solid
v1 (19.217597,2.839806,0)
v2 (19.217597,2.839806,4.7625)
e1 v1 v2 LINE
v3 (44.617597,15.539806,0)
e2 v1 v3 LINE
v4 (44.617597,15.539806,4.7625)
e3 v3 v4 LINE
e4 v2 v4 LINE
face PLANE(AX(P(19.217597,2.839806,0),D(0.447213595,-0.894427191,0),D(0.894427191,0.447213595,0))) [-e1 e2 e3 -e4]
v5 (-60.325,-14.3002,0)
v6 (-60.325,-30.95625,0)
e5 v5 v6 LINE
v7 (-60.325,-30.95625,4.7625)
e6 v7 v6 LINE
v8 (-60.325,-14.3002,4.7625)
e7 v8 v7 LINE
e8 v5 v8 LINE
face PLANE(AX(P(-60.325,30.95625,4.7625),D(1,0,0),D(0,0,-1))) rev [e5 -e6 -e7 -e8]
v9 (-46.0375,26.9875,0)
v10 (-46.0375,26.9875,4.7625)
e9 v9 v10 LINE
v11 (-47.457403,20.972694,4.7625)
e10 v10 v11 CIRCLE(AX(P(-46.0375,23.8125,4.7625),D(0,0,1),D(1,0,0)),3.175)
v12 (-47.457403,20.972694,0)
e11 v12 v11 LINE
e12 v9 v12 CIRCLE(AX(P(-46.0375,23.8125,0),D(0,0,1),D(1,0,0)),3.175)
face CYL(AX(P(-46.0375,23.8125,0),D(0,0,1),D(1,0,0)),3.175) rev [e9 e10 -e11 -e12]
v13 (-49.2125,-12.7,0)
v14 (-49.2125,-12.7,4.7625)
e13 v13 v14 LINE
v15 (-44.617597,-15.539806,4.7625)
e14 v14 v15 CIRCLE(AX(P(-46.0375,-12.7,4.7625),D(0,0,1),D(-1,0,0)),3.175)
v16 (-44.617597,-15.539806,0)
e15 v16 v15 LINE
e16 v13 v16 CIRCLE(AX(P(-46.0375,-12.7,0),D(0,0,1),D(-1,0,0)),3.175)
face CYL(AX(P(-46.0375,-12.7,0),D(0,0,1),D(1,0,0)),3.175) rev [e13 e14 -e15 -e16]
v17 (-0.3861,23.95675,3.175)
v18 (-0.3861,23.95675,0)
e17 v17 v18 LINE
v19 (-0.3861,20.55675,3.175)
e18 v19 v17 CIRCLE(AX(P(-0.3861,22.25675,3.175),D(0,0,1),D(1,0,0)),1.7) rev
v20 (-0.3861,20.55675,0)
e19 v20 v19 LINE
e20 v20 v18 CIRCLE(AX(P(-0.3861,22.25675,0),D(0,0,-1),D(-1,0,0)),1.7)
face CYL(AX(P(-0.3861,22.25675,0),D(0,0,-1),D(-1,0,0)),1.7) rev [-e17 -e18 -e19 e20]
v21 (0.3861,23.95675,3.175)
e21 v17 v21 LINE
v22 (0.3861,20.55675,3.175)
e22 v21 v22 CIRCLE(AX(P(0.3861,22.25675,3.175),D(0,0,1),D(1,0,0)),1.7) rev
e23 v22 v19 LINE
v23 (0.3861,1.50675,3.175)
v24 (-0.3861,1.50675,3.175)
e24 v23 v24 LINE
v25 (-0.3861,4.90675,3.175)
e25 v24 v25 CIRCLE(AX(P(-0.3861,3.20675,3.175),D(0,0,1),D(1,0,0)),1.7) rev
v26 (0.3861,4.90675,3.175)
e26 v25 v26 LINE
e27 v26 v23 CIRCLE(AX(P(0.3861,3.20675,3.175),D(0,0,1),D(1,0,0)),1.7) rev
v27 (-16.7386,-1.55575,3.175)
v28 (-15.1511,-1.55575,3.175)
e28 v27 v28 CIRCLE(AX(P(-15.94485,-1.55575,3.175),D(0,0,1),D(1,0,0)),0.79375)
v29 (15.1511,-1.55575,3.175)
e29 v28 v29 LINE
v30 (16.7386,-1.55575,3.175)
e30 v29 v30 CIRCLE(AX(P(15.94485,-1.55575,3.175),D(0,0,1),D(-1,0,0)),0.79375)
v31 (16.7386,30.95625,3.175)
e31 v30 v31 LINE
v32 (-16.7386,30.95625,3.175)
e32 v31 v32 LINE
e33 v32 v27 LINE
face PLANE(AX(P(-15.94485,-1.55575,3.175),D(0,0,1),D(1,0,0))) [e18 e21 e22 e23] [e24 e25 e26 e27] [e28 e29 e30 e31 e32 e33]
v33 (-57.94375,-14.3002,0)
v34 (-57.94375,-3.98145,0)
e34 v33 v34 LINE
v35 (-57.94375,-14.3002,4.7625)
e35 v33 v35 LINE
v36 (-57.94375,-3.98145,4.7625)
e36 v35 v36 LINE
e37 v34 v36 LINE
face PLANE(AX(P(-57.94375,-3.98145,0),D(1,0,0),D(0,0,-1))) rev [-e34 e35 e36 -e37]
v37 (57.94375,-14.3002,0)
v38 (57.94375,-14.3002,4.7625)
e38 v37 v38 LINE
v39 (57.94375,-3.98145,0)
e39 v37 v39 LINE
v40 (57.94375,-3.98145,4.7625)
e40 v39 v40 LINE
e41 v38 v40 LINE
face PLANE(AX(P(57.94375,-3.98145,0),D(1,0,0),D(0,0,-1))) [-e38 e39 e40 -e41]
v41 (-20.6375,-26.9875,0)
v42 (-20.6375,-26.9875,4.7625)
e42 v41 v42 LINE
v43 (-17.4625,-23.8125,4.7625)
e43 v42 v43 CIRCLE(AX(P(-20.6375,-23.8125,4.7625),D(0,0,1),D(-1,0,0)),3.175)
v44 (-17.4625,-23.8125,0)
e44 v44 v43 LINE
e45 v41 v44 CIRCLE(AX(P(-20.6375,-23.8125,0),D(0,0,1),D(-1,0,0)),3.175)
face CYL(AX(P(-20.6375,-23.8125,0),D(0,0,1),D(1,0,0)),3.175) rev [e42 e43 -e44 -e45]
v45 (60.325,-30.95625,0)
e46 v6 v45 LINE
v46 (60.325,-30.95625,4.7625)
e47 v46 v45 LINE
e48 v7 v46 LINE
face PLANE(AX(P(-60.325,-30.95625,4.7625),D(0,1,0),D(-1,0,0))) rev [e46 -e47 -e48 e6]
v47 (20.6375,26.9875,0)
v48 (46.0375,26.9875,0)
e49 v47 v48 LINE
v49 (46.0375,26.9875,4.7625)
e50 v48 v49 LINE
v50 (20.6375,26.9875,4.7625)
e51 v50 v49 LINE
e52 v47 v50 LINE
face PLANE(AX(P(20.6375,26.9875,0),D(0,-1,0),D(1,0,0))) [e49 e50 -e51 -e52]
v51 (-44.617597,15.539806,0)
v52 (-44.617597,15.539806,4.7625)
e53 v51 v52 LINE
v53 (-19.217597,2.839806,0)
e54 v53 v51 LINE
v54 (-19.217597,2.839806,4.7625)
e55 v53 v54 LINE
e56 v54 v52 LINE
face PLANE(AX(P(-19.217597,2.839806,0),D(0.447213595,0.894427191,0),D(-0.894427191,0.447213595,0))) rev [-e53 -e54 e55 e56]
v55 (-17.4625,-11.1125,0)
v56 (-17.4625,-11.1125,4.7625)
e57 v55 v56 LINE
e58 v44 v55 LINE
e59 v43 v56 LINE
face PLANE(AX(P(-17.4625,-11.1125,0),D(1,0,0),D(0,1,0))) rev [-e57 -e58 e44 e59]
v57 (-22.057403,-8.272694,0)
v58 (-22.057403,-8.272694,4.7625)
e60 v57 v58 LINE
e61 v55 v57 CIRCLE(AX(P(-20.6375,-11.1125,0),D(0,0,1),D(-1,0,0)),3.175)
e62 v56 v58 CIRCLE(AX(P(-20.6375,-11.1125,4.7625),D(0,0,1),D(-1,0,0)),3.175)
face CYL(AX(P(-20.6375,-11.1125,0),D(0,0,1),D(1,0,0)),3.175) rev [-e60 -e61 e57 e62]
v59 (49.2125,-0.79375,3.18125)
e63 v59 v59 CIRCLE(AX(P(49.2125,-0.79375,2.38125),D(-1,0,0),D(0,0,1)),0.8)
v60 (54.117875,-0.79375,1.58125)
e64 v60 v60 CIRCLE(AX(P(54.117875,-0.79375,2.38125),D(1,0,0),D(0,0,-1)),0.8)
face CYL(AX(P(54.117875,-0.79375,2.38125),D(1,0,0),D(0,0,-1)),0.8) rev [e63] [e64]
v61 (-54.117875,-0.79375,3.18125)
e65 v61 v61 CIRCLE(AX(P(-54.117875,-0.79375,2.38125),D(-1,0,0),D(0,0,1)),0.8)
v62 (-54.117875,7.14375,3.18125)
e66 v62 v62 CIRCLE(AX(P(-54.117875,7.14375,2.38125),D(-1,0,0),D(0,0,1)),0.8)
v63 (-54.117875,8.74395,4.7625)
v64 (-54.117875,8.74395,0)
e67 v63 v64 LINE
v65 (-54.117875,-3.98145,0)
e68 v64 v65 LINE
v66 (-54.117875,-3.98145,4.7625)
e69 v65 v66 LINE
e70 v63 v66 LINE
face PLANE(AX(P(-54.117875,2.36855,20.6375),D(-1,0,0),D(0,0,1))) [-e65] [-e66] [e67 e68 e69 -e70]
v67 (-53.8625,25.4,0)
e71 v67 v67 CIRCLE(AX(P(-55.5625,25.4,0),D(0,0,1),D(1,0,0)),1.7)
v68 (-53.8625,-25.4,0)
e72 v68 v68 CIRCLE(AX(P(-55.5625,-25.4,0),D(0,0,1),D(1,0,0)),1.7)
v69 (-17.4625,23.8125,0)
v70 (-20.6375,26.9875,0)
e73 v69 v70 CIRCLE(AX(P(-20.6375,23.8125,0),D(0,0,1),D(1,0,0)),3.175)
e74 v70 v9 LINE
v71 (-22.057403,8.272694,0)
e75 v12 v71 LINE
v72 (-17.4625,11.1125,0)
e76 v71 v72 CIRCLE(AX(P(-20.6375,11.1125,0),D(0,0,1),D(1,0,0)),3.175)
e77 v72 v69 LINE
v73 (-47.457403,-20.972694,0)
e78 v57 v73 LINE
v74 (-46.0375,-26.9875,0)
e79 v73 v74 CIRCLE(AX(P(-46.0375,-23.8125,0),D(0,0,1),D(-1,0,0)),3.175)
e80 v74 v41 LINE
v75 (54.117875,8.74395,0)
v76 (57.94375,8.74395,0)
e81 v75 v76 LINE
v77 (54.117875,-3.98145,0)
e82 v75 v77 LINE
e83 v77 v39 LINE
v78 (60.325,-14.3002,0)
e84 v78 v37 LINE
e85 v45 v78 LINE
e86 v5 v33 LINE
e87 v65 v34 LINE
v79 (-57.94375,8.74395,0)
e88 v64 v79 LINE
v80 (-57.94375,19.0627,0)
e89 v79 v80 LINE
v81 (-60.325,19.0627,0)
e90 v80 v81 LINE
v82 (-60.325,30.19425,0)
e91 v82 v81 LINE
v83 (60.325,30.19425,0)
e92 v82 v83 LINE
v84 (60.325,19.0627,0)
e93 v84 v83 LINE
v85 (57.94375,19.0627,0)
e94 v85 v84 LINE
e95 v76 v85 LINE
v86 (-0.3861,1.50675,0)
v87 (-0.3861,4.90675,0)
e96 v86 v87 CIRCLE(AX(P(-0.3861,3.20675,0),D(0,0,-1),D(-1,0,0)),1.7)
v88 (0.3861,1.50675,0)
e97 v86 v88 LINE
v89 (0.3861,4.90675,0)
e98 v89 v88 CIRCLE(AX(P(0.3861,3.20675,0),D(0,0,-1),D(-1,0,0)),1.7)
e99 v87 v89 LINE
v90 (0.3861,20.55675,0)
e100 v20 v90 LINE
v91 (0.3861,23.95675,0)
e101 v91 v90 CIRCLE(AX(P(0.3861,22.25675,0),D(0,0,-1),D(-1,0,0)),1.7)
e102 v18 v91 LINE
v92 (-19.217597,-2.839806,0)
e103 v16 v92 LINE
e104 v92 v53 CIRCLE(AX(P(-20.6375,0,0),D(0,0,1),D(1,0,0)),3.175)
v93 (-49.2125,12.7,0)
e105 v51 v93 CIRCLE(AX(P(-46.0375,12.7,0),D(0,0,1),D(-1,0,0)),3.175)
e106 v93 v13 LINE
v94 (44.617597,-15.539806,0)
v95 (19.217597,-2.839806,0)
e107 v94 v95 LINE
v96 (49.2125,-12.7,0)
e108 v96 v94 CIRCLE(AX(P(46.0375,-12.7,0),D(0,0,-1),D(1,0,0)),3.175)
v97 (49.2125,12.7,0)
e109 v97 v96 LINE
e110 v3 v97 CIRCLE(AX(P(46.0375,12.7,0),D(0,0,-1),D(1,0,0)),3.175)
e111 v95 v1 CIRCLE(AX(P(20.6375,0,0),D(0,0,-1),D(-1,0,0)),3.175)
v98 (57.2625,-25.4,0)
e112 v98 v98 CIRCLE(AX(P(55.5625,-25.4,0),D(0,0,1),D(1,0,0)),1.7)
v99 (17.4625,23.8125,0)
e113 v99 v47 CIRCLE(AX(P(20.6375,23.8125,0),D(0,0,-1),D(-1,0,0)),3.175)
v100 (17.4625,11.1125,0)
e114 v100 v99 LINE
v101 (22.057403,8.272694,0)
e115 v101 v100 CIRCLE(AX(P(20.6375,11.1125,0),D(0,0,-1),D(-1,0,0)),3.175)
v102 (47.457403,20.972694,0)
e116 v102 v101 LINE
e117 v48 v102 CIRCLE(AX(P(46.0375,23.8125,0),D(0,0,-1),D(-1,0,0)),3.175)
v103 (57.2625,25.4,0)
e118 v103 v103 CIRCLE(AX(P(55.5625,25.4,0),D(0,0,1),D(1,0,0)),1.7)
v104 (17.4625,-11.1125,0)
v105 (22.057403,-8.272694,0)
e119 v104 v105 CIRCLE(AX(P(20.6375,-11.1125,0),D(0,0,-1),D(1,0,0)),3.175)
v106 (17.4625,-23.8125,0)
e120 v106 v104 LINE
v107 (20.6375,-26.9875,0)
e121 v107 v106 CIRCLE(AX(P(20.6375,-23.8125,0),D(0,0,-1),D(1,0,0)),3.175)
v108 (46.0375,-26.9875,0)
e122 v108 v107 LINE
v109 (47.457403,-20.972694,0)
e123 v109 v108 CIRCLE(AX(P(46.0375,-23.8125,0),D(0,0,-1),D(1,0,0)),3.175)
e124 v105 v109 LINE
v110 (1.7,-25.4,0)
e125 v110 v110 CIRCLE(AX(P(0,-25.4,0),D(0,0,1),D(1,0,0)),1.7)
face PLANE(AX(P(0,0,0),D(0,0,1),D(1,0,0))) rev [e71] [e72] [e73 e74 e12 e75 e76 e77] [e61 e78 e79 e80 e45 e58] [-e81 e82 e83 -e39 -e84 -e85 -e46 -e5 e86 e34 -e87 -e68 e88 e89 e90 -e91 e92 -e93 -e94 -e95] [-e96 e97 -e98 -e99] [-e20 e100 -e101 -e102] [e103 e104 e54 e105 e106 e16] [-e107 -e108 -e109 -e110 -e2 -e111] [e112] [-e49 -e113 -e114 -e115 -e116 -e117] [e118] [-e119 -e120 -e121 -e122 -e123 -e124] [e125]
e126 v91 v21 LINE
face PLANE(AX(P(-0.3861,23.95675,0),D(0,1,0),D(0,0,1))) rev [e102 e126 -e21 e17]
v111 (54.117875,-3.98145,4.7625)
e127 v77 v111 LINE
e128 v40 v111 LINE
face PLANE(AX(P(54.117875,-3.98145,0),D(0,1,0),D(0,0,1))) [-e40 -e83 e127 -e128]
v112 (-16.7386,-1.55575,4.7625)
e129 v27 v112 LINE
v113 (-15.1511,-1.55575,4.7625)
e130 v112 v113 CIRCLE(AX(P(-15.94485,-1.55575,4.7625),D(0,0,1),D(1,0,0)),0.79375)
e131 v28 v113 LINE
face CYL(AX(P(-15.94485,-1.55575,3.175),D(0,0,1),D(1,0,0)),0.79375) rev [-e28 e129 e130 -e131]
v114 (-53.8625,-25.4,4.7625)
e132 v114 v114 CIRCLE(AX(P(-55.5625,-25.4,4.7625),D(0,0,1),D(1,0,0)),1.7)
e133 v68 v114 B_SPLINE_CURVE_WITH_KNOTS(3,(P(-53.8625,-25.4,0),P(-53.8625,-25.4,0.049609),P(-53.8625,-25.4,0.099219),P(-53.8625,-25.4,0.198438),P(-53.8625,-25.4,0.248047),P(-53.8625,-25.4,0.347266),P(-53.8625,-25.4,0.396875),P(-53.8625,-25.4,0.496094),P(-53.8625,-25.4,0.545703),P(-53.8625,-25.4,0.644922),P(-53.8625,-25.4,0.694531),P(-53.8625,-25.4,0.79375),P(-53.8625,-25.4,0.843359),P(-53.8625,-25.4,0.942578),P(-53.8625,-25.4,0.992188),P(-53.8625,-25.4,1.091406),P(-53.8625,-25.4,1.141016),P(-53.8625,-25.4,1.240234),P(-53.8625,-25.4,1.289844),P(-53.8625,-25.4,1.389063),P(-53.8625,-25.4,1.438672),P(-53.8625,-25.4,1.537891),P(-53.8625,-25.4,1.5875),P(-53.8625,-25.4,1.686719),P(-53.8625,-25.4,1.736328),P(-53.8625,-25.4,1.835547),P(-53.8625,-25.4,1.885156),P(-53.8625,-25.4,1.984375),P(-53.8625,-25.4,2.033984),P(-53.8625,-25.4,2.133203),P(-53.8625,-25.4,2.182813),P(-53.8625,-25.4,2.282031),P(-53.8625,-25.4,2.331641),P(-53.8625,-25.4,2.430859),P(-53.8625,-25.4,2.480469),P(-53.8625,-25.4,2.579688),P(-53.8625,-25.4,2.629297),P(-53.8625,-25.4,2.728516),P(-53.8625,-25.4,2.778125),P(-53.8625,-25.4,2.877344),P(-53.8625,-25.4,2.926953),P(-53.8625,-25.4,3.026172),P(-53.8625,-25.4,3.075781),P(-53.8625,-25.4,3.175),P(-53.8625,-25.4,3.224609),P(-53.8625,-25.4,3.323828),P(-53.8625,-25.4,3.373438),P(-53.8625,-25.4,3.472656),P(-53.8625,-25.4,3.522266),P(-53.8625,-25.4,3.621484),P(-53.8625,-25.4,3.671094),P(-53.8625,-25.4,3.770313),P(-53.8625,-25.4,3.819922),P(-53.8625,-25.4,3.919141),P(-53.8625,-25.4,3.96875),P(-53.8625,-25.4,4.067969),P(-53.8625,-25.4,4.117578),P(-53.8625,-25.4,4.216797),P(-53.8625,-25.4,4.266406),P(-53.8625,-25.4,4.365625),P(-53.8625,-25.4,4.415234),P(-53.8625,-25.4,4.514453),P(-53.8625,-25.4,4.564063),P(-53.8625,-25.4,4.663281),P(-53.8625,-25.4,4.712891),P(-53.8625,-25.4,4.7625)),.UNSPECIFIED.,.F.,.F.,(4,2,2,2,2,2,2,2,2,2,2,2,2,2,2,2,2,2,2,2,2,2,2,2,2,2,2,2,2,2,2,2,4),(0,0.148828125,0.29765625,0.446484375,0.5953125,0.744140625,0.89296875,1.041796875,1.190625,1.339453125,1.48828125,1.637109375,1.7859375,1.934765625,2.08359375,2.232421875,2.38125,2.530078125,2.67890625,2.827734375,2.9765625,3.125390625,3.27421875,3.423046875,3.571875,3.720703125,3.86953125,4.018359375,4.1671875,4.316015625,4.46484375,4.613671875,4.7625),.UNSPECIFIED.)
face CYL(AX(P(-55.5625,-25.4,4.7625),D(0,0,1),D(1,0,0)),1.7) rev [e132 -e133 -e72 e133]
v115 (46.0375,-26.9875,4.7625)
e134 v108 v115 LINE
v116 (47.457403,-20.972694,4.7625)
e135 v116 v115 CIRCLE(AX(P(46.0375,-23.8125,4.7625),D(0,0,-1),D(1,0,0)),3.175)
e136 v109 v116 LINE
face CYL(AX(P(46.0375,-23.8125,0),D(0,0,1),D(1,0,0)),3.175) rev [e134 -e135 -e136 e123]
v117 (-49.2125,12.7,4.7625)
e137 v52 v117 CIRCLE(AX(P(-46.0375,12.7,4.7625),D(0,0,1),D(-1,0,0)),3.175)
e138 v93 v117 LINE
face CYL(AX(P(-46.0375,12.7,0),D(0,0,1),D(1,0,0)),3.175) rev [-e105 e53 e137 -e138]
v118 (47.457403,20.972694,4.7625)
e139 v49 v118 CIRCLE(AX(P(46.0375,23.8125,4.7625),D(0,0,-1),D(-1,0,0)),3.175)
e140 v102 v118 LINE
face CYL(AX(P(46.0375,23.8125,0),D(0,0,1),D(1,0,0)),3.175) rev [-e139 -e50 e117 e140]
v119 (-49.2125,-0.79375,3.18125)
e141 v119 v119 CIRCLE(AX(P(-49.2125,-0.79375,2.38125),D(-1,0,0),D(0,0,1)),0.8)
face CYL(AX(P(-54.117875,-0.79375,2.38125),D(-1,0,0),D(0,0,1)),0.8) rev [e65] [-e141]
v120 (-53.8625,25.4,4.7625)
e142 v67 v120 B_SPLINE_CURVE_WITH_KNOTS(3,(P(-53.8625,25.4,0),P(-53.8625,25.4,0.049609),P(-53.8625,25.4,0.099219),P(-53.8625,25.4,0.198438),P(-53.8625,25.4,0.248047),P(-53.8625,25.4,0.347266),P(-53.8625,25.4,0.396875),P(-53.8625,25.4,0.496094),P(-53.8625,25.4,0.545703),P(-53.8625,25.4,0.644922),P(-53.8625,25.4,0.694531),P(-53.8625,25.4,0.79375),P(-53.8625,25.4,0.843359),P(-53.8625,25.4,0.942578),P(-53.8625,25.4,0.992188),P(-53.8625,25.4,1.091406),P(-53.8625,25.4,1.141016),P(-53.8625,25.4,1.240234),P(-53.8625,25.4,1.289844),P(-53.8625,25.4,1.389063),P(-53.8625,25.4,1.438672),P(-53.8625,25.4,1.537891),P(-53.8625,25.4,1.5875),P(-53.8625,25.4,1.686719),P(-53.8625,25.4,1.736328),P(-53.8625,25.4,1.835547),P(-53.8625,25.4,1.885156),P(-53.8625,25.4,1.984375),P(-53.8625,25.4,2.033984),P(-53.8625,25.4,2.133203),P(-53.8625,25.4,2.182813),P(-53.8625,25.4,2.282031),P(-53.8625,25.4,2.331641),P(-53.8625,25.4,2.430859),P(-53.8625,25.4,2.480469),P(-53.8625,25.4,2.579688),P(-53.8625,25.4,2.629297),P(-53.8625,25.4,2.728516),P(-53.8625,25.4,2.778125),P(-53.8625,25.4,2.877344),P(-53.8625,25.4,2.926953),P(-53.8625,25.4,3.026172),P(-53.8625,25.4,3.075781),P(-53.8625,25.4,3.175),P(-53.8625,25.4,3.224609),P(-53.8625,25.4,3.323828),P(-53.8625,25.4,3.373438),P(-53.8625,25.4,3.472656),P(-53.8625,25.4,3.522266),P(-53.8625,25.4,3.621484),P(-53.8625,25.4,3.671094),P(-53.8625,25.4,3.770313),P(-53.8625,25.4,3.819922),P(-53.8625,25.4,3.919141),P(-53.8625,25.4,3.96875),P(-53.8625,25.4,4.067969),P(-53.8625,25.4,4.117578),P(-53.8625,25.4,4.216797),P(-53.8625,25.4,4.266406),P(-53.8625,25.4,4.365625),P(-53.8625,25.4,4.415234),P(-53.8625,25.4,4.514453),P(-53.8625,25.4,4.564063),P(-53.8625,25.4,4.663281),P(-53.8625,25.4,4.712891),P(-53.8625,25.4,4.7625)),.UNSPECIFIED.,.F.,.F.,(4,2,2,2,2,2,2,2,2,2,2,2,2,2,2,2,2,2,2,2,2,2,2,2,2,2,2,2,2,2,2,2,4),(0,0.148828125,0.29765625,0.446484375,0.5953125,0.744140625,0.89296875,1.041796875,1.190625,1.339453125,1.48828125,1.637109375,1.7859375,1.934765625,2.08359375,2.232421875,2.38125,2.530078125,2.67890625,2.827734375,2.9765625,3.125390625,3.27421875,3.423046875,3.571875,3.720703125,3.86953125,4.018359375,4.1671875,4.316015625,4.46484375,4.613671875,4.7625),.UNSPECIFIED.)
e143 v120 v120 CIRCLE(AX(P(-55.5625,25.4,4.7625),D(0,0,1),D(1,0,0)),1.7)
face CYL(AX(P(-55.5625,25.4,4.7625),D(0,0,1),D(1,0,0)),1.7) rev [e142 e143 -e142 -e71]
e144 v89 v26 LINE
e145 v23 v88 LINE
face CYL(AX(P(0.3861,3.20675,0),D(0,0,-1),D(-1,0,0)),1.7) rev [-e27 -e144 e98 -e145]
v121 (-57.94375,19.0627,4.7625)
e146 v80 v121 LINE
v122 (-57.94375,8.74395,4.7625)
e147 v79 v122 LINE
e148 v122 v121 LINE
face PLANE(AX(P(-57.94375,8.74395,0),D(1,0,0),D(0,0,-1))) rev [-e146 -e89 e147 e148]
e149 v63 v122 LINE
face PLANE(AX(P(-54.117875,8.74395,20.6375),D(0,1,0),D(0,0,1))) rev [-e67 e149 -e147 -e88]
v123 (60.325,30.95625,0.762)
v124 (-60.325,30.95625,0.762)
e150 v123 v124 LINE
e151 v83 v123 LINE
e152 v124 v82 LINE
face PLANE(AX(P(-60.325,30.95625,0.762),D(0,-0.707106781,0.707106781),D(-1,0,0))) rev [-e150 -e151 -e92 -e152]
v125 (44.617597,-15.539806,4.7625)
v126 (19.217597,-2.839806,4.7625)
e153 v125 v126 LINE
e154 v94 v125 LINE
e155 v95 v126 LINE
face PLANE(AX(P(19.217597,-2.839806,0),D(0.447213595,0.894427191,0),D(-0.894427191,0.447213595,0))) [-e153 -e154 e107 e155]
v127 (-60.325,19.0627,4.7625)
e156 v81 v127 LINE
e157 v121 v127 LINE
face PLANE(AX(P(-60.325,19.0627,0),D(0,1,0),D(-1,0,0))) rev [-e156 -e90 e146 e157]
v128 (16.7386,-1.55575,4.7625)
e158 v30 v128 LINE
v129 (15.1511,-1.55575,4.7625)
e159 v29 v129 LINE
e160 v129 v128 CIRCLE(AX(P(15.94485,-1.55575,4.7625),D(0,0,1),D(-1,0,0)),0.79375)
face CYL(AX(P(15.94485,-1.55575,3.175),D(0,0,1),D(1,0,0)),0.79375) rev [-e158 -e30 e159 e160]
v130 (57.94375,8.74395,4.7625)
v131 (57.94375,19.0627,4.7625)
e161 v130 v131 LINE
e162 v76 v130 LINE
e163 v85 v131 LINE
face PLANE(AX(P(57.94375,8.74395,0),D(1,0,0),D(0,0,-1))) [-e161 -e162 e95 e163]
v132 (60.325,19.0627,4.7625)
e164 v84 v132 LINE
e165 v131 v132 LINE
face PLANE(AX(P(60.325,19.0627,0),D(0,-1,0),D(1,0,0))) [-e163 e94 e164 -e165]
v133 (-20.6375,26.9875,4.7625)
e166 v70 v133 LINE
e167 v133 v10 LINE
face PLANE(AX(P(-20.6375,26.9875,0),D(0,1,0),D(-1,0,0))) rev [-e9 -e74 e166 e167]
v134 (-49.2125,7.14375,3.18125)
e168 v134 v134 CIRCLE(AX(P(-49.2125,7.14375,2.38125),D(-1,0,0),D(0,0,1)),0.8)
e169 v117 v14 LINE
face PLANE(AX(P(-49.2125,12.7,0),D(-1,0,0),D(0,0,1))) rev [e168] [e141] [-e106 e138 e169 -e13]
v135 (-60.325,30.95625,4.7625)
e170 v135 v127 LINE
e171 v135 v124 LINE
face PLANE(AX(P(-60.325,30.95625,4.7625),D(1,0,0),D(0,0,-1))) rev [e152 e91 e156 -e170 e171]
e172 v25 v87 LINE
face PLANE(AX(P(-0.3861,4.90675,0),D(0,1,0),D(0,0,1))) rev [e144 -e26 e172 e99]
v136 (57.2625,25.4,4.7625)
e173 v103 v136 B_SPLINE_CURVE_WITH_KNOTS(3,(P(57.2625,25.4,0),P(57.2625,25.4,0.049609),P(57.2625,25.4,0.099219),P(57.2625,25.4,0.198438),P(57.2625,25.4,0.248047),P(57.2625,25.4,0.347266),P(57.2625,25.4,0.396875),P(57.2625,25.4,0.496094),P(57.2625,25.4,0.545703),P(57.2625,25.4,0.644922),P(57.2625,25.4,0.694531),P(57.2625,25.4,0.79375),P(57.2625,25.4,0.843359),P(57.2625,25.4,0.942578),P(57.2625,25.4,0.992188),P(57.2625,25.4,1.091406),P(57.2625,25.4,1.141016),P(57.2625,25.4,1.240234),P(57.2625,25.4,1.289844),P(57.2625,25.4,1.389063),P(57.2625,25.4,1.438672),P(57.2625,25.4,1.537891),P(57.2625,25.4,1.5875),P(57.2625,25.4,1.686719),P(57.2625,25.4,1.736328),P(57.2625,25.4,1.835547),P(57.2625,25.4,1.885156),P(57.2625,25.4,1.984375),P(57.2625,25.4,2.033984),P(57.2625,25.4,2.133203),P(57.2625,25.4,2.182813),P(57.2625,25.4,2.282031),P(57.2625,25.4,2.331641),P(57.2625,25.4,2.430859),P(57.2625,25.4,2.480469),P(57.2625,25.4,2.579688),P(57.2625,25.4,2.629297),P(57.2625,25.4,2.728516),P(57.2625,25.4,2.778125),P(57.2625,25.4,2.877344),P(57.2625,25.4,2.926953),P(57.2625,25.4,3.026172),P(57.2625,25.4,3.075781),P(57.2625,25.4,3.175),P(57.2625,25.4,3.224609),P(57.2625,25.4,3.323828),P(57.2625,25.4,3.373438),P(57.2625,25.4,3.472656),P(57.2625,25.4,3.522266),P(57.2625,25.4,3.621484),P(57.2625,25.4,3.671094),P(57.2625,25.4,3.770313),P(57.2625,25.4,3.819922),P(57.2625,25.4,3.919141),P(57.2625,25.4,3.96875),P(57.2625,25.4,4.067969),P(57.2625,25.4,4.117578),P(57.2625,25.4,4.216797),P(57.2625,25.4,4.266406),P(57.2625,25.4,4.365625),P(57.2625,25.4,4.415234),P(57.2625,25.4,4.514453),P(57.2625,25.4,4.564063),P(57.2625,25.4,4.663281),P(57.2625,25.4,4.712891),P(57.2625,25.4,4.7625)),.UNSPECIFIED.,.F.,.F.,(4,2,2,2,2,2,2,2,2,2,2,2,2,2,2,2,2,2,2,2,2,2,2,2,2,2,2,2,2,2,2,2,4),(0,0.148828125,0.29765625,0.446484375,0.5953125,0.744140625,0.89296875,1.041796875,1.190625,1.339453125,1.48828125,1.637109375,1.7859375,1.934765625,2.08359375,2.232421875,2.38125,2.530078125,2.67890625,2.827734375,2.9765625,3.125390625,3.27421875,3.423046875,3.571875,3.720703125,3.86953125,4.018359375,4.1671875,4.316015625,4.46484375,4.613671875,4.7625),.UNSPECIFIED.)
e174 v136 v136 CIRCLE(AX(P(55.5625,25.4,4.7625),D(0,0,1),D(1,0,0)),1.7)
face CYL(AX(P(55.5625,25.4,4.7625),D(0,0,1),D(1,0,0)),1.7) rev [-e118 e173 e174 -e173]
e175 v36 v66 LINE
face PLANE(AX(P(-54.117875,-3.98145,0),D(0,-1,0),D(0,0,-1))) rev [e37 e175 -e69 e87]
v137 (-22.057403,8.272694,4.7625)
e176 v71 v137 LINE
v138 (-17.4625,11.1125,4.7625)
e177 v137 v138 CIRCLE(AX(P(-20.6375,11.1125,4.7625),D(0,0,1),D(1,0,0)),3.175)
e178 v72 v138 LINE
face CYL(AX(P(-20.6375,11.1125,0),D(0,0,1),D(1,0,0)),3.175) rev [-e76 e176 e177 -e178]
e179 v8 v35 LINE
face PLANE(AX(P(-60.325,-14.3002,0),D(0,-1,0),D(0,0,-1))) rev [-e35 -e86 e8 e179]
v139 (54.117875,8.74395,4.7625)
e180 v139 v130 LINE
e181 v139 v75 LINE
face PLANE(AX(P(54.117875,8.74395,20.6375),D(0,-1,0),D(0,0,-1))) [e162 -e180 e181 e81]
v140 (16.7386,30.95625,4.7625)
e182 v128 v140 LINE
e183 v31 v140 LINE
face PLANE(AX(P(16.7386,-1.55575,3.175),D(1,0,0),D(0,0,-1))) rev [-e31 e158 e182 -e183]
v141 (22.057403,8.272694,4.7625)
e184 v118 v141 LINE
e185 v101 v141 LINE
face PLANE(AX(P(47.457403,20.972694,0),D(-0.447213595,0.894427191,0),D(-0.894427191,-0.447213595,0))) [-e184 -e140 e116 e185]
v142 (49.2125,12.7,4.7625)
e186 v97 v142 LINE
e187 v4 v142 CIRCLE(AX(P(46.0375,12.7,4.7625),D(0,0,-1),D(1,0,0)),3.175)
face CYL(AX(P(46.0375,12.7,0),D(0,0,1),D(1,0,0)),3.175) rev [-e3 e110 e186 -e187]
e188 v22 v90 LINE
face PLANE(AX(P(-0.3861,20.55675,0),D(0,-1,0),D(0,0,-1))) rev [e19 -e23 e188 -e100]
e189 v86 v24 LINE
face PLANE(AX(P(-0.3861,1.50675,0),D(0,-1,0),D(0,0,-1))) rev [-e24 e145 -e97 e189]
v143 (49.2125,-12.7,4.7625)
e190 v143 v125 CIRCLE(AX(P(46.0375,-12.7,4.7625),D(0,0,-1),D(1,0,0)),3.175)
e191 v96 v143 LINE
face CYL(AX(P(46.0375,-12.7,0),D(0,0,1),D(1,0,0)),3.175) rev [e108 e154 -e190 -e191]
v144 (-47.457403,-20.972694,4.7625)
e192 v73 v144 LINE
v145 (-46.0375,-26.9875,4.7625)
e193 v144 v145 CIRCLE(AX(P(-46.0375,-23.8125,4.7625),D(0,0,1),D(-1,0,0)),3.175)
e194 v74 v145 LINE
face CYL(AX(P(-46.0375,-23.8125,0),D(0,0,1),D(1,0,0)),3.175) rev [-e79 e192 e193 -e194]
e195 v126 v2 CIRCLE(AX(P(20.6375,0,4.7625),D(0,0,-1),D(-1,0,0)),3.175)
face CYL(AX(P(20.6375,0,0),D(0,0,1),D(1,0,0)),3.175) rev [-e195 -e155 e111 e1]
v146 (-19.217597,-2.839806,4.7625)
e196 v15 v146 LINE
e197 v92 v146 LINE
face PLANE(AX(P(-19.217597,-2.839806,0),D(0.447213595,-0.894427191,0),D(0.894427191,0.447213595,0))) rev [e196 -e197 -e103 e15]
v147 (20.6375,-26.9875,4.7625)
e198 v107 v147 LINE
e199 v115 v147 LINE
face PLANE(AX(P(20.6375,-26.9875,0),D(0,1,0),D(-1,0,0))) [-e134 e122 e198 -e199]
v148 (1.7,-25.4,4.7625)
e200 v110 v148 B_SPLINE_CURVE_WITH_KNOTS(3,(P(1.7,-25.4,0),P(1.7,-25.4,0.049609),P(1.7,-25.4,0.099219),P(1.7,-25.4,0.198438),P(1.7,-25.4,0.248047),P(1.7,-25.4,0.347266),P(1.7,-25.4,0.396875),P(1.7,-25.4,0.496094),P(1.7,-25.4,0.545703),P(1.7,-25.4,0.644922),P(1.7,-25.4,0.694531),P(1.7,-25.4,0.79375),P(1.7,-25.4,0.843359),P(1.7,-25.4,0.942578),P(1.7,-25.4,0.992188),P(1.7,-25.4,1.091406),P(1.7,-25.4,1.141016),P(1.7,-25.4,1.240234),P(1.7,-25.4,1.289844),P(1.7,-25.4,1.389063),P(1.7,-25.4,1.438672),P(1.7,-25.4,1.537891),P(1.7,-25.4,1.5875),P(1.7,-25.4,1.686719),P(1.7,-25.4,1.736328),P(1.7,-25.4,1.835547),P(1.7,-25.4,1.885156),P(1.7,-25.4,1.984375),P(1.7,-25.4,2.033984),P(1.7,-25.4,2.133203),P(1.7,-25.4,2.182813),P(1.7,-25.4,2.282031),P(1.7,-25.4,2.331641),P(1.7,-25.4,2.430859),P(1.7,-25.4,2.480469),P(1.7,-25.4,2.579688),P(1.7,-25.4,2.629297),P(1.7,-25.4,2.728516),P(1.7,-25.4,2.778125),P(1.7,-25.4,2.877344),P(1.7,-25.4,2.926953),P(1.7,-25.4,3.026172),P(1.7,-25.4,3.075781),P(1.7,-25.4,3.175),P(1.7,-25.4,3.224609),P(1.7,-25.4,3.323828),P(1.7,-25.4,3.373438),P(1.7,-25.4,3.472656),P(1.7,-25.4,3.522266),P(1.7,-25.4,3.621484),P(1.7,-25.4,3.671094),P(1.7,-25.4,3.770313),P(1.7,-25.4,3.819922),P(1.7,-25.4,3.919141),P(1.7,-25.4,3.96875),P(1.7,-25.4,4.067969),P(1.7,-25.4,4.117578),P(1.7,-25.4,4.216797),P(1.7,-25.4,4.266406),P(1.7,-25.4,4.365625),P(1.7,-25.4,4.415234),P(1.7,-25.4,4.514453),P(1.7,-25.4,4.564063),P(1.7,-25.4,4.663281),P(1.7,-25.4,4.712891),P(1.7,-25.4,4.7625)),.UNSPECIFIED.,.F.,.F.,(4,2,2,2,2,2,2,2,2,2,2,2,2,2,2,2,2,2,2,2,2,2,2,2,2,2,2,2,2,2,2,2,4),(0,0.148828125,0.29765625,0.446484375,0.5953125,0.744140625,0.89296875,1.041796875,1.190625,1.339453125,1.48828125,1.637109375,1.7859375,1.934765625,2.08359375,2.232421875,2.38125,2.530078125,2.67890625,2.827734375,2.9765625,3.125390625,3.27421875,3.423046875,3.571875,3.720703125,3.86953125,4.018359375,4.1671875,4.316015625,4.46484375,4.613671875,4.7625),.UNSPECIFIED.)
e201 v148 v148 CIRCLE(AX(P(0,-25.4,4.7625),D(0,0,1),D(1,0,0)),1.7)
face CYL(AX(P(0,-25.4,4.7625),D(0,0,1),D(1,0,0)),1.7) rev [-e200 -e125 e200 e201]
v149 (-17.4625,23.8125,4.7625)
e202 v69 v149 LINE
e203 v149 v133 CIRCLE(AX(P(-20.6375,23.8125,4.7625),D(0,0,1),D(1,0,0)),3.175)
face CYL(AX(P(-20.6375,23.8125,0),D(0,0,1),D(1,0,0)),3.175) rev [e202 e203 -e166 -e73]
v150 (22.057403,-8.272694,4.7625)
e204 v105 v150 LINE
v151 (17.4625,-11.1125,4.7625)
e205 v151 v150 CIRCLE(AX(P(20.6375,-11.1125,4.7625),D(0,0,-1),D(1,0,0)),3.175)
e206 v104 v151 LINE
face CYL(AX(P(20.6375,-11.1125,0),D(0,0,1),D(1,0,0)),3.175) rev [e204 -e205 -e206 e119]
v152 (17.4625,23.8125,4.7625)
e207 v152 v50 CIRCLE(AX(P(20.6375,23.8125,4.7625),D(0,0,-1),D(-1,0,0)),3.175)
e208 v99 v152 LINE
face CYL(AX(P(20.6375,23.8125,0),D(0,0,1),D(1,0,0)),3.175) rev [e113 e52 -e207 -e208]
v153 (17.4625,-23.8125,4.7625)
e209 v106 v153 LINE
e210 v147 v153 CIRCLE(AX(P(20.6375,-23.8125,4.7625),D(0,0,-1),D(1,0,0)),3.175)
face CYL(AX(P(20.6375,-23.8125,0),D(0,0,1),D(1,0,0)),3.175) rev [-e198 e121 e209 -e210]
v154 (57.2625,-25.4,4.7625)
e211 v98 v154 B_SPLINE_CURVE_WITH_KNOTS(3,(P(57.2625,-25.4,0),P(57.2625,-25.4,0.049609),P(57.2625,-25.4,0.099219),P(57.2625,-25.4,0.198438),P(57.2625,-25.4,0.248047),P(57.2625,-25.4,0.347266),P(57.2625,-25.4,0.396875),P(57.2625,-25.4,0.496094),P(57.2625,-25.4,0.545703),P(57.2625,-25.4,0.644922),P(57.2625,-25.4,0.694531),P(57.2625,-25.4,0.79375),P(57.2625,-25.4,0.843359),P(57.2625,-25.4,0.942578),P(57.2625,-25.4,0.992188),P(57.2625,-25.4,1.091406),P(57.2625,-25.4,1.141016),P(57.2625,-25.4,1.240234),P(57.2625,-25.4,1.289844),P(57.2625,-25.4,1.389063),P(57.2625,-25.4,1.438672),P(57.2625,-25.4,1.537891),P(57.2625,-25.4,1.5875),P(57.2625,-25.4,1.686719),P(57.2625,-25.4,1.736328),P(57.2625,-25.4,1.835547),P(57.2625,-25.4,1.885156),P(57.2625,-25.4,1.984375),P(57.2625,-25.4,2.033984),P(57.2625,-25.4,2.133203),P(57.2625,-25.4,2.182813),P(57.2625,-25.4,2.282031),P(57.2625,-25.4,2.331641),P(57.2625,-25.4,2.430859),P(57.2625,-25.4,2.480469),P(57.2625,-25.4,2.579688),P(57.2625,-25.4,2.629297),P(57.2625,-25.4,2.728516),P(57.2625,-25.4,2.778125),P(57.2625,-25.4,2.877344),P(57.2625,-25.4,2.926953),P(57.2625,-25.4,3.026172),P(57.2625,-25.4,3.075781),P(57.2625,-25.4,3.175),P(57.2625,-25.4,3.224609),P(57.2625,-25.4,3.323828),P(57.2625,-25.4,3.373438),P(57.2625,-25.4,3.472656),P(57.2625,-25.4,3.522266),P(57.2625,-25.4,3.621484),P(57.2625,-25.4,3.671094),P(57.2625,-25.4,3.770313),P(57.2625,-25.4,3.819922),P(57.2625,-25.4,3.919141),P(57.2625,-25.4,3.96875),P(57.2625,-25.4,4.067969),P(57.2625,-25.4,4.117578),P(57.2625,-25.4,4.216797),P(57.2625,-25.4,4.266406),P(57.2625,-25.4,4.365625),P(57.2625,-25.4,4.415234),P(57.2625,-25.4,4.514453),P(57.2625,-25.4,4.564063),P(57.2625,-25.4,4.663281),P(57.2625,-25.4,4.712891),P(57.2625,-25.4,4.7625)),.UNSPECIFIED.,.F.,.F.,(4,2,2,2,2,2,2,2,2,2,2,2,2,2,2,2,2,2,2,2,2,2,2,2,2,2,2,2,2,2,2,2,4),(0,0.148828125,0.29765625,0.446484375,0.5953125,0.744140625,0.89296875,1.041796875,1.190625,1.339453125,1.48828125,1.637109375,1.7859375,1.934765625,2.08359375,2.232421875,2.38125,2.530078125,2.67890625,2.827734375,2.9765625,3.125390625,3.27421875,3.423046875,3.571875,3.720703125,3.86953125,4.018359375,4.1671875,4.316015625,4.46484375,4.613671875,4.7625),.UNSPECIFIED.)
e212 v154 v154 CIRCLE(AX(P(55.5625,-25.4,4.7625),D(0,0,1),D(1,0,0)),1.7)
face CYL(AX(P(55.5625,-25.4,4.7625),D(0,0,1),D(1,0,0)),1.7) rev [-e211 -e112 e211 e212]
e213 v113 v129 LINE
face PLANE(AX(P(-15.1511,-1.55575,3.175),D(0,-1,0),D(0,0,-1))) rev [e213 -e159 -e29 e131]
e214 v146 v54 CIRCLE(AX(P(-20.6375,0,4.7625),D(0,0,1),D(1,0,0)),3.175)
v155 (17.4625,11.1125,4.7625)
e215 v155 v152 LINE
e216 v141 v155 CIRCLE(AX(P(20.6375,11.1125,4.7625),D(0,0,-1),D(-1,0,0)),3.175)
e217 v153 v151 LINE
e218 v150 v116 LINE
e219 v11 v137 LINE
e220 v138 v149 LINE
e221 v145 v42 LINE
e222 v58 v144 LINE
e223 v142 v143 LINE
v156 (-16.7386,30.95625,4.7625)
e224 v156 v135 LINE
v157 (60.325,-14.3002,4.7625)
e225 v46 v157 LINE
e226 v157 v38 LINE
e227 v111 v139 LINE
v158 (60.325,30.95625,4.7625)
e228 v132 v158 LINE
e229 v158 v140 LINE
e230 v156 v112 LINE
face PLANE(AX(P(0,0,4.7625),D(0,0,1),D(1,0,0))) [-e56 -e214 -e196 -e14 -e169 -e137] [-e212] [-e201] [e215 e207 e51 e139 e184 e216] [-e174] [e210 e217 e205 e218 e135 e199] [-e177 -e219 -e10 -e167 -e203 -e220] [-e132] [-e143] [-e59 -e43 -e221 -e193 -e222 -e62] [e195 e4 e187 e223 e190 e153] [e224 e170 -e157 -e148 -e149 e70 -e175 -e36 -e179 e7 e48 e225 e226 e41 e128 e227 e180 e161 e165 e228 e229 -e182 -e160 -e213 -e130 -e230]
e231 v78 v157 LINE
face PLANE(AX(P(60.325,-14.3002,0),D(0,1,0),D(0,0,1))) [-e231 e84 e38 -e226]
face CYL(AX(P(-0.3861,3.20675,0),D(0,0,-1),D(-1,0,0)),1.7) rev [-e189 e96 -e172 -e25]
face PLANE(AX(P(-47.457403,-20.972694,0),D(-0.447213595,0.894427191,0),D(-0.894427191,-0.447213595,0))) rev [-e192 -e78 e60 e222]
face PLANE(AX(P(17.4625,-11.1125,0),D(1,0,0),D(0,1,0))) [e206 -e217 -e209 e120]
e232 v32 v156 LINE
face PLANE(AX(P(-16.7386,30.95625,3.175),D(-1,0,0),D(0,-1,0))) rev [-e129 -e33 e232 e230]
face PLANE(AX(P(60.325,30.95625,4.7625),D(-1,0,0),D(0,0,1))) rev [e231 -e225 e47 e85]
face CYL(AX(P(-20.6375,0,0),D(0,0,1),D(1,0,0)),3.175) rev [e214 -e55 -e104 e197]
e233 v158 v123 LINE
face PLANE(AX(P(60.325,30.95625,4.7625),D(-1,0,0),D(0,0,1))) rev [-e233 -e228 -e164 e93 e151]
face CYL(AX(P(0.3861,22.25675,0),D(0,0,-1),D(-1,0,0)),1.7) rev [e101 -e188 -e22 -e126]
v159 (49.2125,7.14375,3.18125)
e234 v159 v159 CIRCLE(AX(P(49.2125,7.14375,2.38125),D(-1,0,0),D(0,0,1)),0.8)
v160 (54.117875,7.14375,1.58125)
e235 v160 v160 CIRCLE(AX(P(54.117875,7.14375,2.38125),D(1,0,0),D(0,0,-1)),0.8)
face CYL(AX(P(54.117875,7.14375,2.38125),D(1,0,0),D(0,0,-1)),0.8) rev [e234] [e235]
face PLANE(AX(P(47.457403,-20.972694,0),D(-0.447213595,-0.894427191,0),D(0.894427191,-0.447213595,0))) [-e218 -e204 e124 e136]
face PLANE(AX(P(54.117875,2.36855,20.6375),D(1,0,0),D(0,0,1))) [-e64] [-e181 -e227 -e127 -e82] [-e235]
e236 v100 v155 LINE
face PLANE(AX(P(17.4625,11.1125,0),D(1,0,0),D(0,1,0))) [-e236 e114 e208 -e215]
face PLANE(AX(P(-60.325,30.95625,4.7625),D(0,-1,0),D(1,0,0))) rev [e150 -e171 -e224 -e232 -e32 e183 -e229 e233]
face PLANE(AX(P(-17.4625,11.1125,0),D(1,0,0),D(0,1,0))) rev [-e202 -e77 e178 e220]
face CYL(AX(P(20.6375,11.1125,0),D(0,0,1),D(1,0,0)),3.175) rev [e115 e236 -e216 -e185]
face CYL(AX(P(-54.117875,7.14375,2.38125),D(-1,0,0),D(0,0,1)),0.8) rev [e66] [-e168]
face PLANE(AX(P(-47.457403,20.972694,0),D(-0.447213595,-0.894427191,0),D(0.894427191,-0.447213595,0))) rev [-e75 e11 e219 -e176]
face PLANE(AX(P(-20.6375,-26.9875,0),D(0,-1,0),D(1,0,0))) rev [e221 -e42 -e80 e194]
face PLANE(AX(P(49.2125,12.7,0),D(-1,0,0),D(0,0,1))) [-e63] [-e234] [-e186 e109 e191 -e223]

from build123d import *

# Parameters (mm, degrees)
SKETCH1_W                 = 120.65
SKETCH1_H                 = 61.9125
BOSS_EXTRUDE1_DEPTH       = 4.7625
SKETCH2_W                 = 4.7625
SKETCH2_H                 = 12.7254
BOSS_EXTRUDE2_DEPTH       = 22.225
CUT_EXTRUDE1_REACH        = 129.448
SKETCH3_R                 = 2.25
FILLET1_R                 = 6.35
FILLET1_OF_MIRROR2_R      = 6.35
M3_CLEARANCE_SLOT1_DEPTH  = 4.7625
SKETCH7_W                 = 2.38125
SKETCH7_H                 = 10.31875
CUT_EXTRUDE3_DEPTH        = 72.353666087
CUT_EXTRUDE4_DEPTH        = 6.207125
CUT_EXTRUDE5_DEPTH        = 72.353666087
CUT_EXTRUDE6_DEPTH        = 72.353666087
M2X0_4_TAPPED_HOLE1_D     = 1.6
M2X0_4_TAPPED_HOLE1_DEPTH = 4.905375
CUT_EXTRUDE7_DEPTH        = 1.5875
M3_CLEARANCE_HOLE2_D      = 3.4
CHAMFER1_SIZE             = 0.762


# Read off the part's stored shape, not the designer's step: M3 Clearance Slot1
with BuildPart() as part:
    # Sketch1 → Boss-Extrude1 (new body)
    with BuildSketch(Plane.XY):
        Rectangle(SKETCH1_W, SKETCH1_H)
    extrude(amount=BOSS_EXTRUDE1_DEPTH)

    # Sketch2 → Boss-Extrude2 (add)
    with BuildSketch(Plane.XY.offset(4.7625)):
        with Locations((-57.94375, 2.38125)):
            Rectangle(SKETCH2_W, SKETCH2_H)
    boss_extrude2 = extrude(amount=BOSS_EXTRUDE2_DEPTH)

    # Sketch3 → Cut-Extrude1 (cut, up to next)
    with BuildSketch(Plane.ZY.offset(60.325), mode=Mode.PRIVATE) as cut_extrude1_sk1:
        with Locations((19.05, 2.36855)):
            Circle(SKETCH3_R)
    cut_extrude1_tool1 = extrude(cut_extrude1_sk1.sketch, amount=-CUT_EXTRUDE1_REACH, mode=Mode.PRIVATE) & part.part
    cut_extrude1 = cut_extrude1_tool1.solids().sort_by_distance((-60.325, 2.36855, 19.05))[0]
    add(cut_extrude1, mode=Mode.SUBTRACT)

    # Fillet1
    fillet1_edges = [part.edges().sort_by_distance(p)[0] for p in [
        (-57.94375, -3.98145, 26.9875),
        (-57.94375, 8.74395, 26.9875),
    ]]
    fillet(fillet1_edges, radius=FILLET1_R)

    # Mirror2: Boss-Extrude2, Cut-Extrude1 across plane
    add(boss_extrude2.mirror(Plane(origin=(0, 0, 0), x_dir=(0, 0, 1), z_dir=(1, 0, 0))))
    add(cut_extrude1.mirror(Plane(origin=(0, 0, 0), x_dir=(0, 0, 1), z_dir=(1, 0, 0))), mode=Mode.SUBTRACT)

    # Fillet1 of Mirror2
    fillet1_of_mirror2_edges = [part.edges().sort_by_distance(p)[0] for p in [
        (57.94375, -3.98145, 26.9875),
        (57.94375, 8.74395, 26.9875),
    ]]
    fillet(fillet1_of_mirror2_edges, radius=FILLET1_OF_MIRROR2_R)

    # M3 Clearance Slot1 outline → M3 Clearance Slot1 (cut)
    with BuildSketch(Plane.XY):
        with BuildLine():
            ThreePointArc((0.386099968, 1.50675), (2.086099968, 3.20675), (0.386099968, 4.90675))
            Line((0.386099968, 4.90675), (-0.386099968, 4.90675))
            ThreePointArc((-0.386099968, 4.90675), (-2.086099968, 3.20675), (-0.386099968, 1.50675))
            Line((-0.386099968, 1.50675), (0.386099968, 1.50675))
        make_face()
        with BuildLine():
            ThreePointArc((0.386099968, 20.55675), (2.086099968, 22.25675), (0.386099968, 23.95675))
            Line((0.386099968, 23.95675), (-0.386099968, 23.95675))
            ThreePointArc((-0.386099968, 23.95675), (-2.086099968, 22.25675), (-0.386099968, 20.55675))
            Line((-0.386099968, 20.55675), (0.386099968, 20.55675))
        make_face()
    extrude(amount=M3_CLEARANCE_SLOT1_DEPTH, mode=Mode.SUBTRACT)

    # Sketch7 → Cut-Extrude3 (cut, through all)
    with BuildSketch(Plane.XY.offset(4.7625)):
        with Locations((-59.134375, 13.903325)):
            Rectangle(SKETCH7_W, SKETCH7_H)
        with Locations((-59.134375, -9.140825)):
            Rectangle(SKETCH7_W, SKETCH7_H)
    cut_extrude3 = extrude(amount=-CUT_EXTRUDE3_DEPTH, mode=Mode.SUBTRACT)

    # Sketch8 → Cut-Extrude4 (cut)
    with BuildSketch(Plane.ZY.offset(60.325)):
        with BuildLine():
            Line((0, 8.74395), (0, -3.98145))
            Line((0, -3.98145), (20.6375, -3.98145))
            ThreePointArc((20.6375, -3.98145), (25.127628061, -2.121578061), (26.9875, 2.36855))
            Line((26.9875, 2.36855), (26.9875, 2.39395))
            ThreePointArc((26.9875, 2.39395), (25.127628061, 6.884078061), (20.6375, 8.74395))
            Line((20.6375, 8.74395), (0, 8.74395))
        make_face()
    cut_extrude4 = extrude(amount=-CUT_EXTRUDE4_DEPTH, mode=Mode.SUBTRACT)

    # Sketch11 → Cut-Extrude5 (cut, through all)
    with BuildSketch(Plane.XY.offset(4.7625)):
        with BuildLine():
            Line((-19.217596834, 2.839806331), (-44.617596834, 15.539806331))
            ThreePointArc((-44.617596834, 15.539806331), (-47.706696281, 15.400816317), (-49.2125, 12.7))
            Line((-49.2125, 12.7), (-49.2125, -12.7))
            ThreePointArc((-49.2125, -12.7), (-47.706696281, -15.400816317), (-44.617596834, -15.539806331))
            Line((-44.617596834, -15.539806331), (-19.217596834, -2.839806331))
            ThreePointArc((-19.217596834, -2.839806331), (-17.4625, 0), (-19.217596834, 2.839806331))
        make_face()
    cut_extrude5 = extrude(amount=-CUT_EXTRUDE5_DEPTH, mode=Mode.SUBTRACT)

    # Sketch12 → Cut-Extrude6 (cut, through all)
    with BuildSketch(Plane.XY.offset(4.7625)):
        with BuildLine():
            Line((-47.457403166, 20.972693669), (-22.057403166, 8.272693669))
            ThreePointArc((-22.057403166, 8.272693669), (-18.968303719, 8.411683683), (-17.4625, 11.1125))
            Line((-17.4625, 11.1125), (-17.4625, 23.8125))
            ThreePointArc((-17.4625, 23.8125), (-18.39243597, 26.05756403), (-20.6375, 26.9875))
            Line((-20.6375, 26.9875), (-46.0375, 26.9875))
            ThreePointArc((-46.0375, 26.9875), (-49.127565542, 24.541965523), (-47.457403166, 20.972693669))
        make_face()
        with BuildLine():
            Line((-20.6375, -26.9875), (-46.0375, -26.9875))
            ThreePointArc((-46.0375, -26.9875), (-49.127565542, -24.541965523), (-47.457403166, -20.972693669))
            Line((-47.457403166, -20.972693669), (-22.057403166, -8.272693669))
            ThreePointArc((-22.057403166, -8.272693669), (-18.968303719, -8.411683683), (-17.4625, -11.1125))
            Line((-17.4625, -11.1125), (-17.4625, -23.8125))
            ThreePointArc((-17.4625, -23.8125), (-18.39243597, -26.05756403), (-20.6375, -26.9875))
        make_face()
    cut_extrude6 = extrude(amount=-CUT_EXTRUDE6_DEPTH, mode=Mode.SUBTRACT)

    # M2x0.4 Tapped Hole1
    with Locations(Plane.ZY.offset(54.117875)):
        with Locations((2.38125, 7.14375), (2.38125, -0.79375)):
            m2x0_4_tapped_hole1 = Hole(M2X0_4_TAPPED_HOLE1_D / 2, depth=M2X0_4_TAPPED_HOLE1_DEPTH)

    # Mirror4: Cut-Extrude5, Cut-Extrude6 across plane
    add(cut_extrude5.mirror(Plane(origin=(0, 0, 0), x_dir=(0, 0, 1), z_dir=(1, 0, 0))), mode=Mode.SUBTRACT)
    add(cut_extrude6.mirror(Plane(origin=(0, 0, 0), x_dir=(0, 0, 1), z_dir=(1, 0, 0))), mode=Mode.SUBTRACT)

    # Mirror3: Cut-Extrude3, Cut-Extrude4, M2x0.4 Tapped Hole1 across plane
    add(cut_extrude3.mirror(Plane(origin=(0, 0, 0), x_dir=(0, 0, 1), z_dir=(1, 0, 0))), mode=Mode.SUBTRACT)
    add(cut_extrude4.mirror(Plane(origin=(0, 0, 0), x_dir=(0, 0, 1), z_dir=(1, 0, 0))), mode=Mode.SUBTRACT)
    add(m2x0_4_tapped_hole1.mirror(Plane(origin=(0, 0, 0), x_dir=(0, 0, 1), z_dir=(1, 0, 0))), mode=Mode.SUBTRACT)

    # Sketch13 → Cut-Extrude7 (cut)
    with BuildSketch(Plane.XY.offset(4.7625)):
        with BuildLine():
            Line((-16.7386, 30.95625), (-16.7386, -1.55575))
            ThreePointArc((-16.7386, -1.55575), (-15.94485, -2.3495), (-15.1511, -1.55575))
            Line((-15.1511, -1.55575), (15.1511, -1.55575))
            ThreePointArc((15.1511, -1.55575), (15.94485, -2.3495), (16.7386, -1.55575))
            Line((16.7386, -1.55575), (16.7386, 30.95625))
            Line((16.7386, 30.95625), (-16.7386, 30.95625))
        make_face()
    extrude(amount=-CUT_EXTRUDE7_DEPTH, mode=Mode.SUBTRACT)

    # M3 Clearance Hole2 (through all)
    with Locations(Plane.XY.offset(4.7625)):
        with Locations((-55.5625, 25.4), (-55.5625, -25.4), (0, -25.4), (55.5625, 25.4), (55.5625, -25.4)):
            Hole(M3_CLEARANCE_HOLE2_D / 2)

    # Chamfer1
    chamfer1_edges = [part.edges().sort_by_distance(p)[0] for p in [
        (0, 30.95625, 0),
    ]]
    chamfer(chamfer1_edges, length=CHAMFER1_SIZE)


solid = part.part
